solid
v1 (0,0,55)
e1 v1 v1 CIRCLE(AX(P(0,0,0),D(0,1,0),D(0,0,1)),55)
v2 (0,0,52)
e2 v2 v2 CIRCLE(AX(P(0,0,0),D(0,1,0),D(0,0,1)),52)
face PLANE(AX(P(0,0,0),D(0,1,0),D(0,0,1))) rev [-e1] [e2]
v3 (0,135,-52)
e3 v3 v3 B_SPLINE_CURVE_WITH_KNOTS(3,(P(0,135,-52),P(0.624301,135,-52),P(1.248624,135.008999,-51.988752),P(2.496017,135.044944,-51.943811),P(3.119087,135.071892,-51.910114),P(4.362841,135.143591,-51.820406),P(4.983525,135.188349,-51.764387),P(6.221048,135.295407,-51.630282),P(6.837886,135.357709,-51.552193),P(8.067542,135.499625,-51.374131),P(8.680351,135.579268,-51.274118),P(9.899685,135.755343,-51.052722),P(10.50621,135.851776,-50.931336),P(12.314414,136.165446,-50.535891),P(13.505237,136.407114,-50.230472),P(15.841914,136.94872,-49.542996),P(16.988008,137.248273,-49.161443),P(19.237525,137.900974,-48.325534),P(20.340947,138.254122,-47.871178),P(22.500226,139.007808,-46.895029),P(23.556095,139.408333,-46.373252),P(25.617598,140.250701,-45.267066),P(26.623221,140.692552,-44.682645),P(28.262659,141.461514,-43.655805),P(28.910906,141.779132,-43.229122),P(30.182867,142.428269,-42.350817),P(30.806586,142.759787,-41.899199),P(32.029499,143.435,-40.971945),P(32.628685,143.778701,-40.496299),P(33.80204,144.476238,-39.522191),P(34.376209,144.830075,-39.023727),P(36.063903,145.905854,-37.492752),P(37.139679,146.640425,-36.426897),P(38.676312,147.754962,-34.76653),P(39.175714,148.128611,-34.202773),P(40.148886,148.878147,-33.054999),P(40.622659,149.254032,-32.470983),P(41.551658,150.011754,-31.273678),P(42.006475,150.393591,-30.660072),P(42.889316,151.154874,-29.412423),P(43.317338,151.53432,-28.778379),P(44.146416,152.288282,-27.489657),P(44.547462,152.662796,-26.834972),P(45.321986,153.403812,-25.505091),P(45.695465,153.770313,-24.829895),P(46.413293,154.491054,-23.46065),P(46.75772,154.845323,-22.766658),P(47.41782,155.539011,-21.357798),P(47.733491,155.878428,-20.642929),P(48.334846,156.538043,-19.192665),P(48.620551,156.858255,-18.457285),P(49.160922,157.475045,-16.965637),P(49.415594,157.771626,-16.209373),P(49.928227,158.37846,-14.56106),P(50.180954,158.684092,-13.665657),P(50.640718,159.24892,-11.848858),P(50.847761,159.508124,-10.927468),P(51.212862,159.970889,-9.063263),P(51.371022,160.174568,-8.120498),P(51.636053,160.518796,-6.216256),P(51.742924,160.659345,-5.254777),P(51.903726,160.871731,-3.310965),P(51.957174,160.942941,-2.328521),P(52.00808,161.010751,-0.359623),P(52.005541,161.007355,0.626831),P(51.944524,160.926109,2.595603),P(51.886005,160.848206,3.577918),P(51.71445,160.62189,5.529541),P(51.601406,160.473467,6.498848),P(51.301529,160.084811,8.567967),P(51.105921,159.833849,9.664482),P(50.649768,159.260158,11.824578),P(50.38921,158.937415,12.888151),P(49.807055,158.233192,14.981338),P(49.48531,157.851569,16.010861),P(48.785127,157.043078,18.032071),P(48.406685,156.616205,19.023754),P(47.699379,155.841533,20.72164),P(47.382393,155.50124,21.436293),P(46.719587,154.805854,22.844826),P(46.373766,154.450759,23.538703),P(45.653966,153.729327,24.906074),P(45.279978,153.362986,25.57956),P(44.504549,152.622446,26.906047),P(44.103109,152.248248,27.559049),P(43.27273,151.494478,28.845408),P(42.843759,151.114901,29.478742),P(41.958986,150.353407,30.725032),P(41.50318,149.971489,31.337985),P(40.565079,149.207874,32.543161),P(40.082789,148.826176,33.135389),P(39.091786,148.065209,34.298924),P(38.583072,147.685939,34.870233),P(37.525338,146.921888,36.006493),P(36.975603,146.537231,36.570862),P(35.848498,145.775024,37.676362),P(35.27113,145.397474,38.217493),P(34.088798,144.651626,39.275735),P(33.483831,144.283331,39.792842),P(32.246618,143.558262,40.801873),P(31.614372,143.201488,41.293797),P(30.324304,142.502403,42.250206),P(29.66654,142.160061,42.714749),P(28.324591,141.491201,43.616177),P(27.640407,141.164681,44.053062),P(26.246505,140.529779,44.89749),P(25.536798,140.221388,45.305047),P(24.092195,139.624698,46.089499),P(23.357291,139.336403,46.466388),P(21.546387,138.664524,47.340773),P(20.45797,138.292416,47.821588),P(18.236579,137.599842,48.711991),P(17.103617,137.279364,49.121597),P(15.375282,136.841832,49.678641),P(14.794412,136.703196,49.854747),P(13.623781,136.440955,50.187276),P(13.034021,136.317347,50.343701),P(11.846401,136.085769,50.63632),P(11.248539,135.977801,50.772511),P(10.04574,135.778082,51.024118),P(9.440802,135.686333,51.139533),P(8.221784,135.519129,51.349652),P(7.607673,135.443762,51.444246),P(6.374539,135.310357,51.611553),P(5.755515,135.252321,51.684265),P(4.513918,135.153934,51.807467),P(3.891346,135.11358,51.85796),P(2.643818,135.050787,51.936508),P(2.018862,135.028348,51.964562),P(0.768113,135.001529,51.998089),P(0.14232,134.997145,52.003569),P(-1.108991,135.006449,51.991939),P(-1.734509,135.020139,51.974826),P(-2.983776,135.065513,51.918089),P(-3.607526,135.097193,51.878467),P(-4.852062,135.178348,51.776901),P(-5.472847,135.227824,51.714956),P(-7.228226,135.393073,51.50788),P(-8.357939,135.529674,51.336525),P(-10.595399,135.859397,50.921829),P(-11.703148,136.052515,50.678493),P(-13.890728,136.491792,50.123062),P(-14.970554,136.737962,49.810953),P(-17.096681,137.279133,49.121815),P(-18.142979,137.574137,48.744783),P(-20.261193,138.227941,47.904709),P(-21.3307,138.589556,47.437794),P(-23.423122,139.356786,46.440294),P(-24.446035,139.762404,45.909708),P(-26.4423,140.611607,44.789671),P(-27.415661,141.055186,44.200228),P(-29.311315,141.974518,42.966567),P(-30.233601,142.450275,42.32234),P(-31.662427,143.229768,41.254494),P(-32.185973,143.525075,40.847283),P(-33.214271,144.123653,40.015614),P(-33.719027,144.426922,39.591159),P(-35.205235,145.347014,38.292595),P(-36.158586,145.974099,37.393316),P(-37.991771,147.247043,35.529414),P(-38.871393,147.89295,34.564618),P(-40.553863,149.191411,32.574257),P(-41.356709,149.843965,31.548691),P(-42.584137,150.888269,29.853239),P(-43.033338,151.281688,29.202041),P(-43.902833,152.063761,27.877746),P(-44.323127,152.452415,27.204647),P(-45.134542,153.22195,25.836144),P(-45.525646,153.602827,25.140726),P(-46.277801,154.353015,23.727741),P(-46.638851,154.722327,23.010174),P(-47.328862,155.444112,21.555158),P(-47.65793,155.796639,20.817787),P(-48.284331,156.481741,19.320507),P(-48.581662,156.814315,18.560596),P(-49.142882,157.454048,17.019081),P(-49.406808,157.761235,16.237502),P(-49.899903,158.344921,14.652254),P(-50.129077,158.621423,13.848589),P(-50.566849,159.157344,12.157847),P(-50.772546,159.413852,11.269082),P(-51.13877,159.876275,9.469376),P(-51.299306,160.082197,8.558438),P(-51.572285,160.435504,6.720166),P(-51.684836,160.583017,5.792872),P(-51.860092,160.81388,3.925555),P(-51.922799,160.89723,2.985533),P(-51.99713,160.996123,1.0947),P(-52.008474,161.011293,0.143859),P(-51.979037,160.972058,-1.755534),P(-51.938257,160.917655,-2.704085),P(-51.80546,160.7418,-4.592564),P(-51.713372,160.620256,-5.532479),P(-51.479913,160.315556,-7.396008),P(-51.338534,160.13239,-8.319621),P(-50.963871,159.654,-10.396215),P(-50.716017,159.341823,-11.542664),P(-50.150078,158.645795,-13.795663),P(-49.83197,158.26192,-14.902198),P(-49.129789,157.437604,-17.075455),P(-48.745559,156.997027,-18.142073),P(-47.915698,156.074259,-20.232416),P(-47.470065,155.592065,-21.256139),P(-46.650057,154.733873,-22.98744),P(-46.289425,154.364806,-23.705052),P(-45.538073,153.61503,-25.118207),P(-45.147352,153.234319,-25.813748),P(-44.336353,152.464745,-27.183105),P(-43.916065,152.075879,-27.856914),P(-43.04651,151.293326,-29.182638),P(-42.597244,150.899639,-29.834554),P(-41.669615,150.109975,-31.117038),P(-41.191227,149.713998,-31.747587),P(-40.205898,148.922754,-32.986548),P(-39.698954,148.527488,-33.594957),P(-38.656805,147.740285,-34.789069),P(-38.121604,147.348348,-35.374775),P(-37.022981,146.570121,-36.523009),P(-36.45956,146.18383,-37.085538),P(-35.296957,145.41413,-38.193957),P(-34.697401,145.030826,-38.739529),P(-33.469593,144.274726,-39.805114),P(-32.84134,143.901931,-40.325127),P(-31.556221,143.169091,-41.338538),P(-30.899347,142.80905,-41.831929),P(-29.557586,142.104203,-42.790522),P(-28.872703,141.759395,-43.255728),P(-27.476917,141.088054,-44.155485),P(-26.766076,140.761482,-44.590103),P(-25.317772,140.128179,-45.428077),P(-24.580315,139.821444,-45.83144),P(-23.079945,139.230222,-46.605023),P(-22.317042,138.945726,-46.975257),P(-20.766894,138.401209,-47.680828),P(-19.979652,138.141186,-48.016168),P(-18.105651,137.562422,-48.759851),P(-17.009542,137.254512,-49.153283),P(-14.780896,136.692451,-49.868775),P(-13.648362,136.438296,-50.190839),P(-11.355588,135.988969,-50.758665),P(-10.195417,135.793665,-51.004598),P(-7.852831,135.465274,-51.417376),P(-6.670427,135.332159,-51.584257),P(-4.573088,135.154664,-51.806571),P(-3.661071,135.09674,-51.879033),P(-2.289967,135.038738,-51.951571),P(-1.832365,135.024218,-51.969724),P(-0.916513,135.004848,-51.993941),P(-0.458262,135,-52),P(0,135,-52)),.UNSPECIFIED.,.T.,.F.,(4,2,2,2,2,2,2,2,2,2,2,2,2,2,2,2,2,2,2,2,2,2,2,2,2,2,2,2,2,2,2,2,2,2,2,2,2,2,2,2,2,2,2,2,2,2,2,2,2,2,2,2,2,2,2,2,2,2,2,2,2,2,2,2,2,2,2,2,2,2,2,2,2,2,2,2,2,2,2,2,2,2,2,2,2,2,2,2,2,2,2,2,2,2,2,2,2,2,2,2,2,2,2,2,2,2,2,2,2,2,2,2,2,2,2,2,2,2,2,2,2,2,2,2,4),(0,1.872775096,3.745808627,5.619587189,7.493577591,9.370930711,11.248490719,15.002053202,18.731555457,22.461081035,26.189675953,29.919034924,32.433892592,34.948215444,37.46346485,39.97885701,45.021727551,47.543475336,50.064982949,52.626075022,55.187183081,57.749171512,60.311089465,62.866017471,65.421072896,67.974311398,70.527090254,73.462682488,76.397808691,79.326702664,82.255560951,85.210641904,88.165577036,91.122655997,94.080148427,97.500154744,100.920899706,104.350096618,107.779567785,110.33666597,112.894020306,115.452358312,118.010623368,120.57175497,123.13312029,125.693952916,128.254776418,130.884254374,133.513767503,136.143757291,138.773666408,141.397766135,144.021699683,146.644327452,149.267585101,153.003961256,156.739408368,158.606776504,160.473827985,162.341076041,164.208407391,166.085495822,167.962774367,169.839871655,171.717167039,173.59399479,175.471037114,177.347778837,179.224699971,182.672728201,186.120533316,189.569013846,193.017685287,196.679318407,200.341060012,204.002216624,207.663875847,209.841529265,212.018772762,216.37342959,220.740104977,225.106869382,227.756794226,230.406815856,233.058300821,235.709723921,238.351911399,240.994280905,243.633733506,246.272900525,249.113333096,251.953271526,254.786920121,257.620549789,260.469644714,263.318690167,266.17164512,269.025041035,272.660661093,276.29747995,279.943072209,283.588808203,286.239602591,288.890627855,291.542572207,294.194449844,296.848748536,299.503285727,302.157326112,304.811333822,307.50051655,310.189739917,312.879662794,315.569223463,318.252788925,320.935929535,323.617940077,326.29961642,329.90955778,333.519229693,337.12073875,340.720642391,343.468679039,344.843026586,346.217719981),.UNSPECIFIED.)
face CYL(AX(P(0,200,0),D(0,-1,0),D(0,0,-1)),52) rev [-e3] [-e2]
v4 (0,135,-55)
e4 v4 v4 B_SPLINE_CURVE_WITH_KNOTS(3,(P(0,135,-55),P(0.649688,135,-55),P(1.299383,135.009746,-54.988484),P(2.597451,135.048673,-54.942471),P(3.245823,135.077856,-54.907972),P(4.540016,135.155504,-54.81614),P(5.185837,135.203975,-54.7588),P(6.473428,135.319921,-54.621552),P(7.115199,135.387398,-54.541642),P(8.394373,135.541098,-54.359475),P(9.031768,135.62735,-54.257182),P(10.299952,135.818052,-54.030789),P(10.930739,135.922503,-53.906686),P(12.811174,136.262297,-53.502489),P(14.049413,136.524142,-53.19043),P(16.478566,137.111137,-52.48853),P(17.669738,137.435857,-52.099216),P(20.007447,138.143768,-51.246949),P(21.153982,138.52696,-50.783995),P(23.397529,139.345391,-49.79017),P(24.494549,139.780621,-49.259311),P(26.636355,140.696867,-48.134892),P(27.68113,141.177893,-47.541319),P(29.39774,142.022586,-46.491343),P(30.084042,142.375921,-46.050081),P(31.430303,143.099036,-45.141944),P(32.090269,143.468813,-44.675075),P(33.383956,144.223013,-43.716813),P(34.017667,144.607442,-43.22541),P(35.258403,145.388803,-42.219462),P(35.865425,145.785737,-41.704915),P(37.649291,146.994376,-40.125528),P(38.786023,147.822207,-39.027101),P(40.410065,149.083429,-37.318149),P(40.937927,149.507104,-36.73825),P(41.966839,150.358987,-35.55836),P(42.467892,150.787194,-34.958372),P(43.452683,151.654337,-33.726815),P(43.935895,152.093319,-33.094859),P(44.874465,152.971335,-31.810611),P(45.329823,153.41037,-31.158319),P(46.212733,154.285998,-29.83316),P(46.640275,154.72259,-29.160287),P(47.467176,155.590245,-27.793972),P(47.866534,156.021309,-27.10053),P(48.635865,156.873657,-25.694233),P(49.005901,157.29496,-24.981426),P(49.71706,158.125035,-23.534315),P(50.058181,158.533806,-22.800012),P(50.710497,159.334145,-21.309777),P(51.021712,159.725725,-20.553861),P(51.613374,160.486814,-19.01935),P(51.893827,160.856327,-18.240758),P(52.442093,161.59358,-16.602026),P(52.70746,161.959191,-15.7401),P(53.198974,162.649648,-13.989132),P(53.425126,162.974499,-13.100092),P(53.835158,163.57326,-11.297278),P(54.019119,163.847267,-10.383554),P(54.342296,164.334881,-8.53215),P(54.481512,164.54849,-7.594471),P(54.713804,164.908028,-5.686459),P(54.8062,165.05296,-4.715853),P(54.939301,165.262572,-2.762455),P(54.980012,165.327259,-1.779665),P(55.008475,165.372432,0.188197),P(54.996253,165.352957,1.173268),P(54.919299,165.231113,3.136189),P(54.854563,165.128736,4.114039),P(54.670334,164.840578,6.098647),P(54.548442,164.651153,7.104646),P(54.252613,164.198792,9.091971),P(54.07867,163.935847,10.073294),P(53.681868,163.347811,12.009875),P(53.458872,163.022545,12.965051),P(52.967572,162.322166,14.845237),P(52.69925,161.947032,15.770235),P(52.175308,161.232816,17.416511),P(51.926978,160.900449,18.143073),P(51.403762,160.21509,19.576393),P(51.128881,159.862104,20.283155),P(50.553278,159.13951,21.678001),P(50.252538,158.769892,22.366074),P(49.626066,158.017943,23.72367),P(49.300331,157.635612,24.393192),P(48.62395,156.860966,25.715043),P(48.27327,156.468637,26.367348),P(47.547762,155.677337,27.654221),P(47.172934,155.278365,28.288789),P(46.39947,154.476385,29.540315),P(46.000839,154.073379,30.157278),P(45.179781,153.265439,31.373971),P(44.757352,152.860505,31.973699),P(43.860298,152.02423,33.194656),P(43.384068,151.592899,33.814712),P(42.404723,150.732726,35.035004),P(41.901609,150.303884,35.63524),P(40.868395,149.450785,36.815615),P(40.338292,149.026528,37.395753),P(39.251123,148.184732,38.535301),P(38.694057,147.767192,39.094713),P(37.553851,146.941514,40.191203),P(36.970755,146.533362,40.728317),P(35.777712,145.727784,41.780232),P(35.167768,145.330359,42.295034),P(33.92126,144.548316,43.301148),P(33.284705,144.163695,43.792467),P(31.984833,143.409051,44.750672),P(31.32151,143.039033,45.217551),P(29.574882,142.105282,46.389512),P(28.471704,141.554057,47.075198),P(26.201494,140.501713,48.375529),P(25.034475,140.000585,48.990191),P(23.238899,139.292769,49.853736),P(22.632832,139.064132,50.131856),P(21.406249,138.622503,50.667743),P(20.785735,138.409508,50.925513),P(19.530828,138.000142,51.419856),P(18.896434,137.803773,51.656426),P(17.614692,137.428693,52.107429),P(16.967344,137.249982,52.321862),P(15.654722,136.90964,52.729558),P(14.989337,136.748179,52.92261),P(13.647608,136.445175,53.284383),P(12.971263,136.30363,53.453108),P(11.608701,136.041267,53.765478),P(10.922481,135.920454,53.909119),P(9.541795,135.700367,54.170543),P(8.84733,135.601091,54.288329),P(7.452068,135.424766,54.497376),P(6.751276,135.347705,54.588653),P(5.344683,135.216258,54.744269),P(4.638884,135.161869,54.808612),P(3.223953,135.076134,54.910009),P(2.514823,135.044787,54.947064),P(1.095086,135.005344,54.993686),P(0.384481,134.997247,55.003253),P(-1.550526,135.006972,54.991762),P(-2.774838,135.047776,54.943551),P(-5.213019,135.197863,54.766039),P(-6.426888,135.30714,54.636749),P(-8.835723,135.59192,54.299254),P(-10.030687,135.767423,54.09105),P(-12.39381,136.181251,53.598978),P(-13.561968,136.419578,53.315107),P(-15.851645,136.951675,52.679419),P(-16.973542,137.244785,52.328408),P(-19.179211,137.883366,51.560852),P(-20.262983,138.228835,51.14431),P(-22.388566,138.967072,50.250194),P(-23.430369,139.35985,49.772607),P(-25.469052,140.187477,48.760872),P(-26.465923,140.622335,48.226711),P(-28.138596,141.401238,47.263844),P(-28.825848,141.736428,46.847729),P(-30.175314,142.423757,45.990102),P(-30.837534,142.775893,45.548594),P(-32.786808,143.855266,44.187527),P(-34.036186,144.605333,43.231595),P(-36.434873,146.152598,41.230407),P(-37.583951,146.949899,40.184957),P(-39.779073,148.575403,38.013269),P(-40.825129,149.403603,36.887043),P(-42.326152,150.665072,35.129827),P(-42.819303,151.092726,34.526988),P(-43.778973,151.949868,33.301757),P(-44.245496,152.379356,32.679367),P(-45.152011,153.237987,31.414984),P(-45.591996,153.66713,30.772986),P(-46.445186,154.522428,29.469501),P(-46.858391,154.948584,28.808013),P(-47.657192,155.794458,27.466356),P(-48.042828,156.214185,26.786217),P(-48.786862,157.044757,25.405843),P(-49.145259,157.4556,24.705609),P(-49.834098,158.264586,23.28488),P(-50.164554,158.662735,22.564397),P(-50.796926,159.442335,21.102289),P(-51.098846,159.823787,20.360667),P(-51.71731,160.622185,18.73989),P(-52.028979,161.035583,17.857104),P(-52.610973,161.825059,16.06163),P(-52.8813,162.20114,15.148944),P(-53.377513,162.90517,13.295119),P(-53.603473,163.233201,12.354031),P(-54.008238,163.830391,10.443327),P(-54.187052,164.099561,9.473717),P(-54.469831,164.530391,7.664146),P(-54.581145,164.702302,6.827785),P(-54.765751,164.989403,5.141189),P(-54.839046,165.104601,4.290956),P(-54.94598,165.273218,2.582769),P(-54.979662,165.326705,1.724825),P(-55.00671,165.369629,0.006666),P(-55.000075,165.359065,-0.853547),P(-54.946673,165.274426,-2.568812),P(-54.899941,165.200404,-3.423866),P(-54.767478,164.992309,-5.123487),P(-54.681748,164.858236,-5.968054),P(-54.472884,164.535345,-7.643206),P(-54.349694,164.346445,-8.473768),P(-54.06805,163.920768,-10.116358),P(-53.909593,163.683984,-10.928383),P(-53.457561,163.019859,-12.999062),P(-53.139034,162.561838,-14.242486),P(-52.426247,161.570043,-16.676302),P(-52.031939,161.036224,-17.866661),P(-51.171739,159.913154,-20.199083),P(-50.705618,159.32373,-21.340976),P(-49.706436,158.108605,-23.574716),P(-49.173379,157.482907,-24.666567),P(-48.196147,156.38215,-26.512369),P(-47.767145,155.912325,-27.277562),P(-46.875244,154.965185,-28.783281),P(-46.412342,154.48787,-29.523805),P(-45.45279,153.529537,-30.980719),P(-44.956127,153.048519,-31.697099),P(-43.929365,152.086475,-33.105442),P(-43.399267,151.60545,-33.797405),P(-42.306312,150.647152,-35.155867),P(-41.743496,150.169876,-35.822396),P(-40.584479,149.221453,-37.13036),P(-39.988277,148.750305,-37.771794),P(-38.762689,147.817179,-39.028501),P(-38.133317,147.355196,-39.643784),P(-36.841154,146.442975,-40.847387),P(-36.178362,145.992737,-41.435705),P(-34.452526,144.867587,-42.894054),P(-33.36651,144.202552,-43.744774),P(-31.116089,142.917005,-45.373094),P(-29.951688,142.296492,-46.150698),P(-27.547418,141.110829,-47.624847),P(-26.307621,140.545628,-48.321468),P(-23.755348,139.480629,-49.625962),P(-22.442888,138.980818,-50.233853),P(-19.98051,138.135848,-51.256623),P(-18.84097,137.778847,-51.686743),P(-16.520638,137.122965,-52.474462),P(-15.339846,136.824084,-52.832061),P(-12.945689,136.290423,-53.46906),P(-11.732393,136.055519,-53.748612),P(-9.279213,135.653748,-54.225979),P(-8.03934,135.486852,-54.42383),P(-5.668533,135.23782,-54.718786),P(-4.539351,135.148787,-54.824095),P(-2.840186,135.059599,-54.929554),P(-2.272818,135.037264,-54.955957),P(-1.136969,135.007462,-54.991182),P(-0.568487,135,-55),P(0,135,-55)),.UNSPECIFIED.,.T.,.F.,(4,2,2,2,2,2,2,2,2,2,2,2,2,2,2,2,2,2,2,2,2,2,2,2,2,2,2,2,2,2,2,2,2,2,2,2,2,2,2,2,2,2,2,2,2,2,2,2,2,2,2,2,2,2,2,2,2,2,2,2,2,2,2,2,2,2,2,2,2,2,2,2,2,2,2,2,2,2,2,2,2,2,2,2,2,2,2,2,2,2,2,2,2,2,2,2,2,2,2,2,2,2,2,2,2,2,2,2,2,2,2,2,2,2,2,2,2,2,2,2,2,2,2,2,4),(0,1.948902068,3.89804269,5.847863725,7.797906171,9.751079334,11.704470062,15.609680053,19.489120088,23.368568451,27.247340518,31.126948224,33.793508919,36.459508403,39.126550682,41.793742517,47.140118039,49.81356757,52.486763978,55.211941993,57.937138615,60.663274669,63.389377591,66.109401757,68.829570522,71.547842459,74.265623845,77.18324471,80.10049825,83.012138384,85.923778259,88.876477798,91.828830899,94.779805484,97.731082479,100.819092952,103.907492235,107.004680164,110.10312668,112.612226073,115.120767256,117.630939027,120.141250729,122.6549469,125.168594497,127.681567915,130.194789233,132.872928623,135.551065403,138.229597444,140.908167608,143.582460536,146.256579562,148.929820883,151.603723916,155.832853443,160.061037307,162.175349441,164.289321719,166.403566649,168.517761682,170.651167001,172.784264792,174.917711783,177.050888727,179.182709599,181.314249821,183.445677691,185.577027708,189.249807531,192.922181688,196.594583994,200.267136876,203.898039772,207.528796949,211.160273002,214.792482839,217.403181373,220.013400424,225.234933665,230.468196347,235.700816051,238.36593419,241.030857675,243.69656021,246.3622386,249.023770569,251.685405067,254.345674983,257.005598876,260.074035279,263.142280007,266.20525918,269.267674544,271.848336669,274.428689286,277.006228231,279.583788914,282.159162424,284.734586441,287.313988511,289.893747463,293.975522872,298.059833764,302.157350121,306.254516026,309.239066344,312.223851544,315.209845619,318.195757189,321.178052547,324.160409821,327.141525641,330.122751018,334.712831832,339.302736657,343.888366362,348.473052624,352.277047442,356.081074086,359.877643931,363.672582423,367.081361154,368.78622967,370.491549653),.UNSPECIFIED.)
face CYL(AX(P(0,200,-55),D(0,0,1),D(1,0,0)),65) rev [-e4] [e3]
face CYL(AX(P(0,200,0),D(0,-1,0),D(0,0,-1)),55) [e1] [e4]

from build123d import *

# Parameters (mm, degrees)
SKETCH_1_R               = 55
EXTRUDE_1_DEPTH          = 200
SHELL_1_OUTLINE_R        = 52
SHELL_1_DEPTH            = 200
CUT_EXTRUDE_1_DEPTH      = 215.592637339
CUT_EXTRUDE_1_DEPTH_BACK = 215.592637339
SKETCH_2_R               = 65


# Read off the part's stored shape, not the designer's step: Оболочка1
with BuildPart() as part:
    # Эскиз1 → Бобышка-Вытянуть1 (new body)
    with BuildSketch(Plane(origin=(0, 0, 0), x_dir=(1, 0, 0), z_dir=(0, 1, 0))):
        with Locations(Location((0, 0, 0), (0, 0, 270))):
            Circle(SKETCH_1_R)
    extrude(amount=EXTRUDE_1_DEPTH)

    # Оболочка1 outline → Оболочка1 (cut)
    with BuildSketch(Plane(origin=(0, 0, 0), x_dir=(1, 0, 0), z_dir=(0, 1, 0))):
        Circle(SHELL_1_OUTLINE_R)
    extrude(amount=SHELL_1_DEPTH, mode=Mode.SUBTRACT)

    # Эскиз2 → Вырез-Вытянуть1 (cut, two sides: drawn at the far end of the back side and taken through both)
    with BuildSketch(Plane.XY.offset(-CUT_EXTRUDE_1_DEPTH_BACK)):
        with Locations((0, 200)):
            Circle(SKETCH_2_R)
    extrude(amount=CUT_EXTRUDE_1_DEPTH + CUT_EXTRUDE_1_DEPTH_BACK, mode=Mode.SUBTRACT)


solid = part.part
